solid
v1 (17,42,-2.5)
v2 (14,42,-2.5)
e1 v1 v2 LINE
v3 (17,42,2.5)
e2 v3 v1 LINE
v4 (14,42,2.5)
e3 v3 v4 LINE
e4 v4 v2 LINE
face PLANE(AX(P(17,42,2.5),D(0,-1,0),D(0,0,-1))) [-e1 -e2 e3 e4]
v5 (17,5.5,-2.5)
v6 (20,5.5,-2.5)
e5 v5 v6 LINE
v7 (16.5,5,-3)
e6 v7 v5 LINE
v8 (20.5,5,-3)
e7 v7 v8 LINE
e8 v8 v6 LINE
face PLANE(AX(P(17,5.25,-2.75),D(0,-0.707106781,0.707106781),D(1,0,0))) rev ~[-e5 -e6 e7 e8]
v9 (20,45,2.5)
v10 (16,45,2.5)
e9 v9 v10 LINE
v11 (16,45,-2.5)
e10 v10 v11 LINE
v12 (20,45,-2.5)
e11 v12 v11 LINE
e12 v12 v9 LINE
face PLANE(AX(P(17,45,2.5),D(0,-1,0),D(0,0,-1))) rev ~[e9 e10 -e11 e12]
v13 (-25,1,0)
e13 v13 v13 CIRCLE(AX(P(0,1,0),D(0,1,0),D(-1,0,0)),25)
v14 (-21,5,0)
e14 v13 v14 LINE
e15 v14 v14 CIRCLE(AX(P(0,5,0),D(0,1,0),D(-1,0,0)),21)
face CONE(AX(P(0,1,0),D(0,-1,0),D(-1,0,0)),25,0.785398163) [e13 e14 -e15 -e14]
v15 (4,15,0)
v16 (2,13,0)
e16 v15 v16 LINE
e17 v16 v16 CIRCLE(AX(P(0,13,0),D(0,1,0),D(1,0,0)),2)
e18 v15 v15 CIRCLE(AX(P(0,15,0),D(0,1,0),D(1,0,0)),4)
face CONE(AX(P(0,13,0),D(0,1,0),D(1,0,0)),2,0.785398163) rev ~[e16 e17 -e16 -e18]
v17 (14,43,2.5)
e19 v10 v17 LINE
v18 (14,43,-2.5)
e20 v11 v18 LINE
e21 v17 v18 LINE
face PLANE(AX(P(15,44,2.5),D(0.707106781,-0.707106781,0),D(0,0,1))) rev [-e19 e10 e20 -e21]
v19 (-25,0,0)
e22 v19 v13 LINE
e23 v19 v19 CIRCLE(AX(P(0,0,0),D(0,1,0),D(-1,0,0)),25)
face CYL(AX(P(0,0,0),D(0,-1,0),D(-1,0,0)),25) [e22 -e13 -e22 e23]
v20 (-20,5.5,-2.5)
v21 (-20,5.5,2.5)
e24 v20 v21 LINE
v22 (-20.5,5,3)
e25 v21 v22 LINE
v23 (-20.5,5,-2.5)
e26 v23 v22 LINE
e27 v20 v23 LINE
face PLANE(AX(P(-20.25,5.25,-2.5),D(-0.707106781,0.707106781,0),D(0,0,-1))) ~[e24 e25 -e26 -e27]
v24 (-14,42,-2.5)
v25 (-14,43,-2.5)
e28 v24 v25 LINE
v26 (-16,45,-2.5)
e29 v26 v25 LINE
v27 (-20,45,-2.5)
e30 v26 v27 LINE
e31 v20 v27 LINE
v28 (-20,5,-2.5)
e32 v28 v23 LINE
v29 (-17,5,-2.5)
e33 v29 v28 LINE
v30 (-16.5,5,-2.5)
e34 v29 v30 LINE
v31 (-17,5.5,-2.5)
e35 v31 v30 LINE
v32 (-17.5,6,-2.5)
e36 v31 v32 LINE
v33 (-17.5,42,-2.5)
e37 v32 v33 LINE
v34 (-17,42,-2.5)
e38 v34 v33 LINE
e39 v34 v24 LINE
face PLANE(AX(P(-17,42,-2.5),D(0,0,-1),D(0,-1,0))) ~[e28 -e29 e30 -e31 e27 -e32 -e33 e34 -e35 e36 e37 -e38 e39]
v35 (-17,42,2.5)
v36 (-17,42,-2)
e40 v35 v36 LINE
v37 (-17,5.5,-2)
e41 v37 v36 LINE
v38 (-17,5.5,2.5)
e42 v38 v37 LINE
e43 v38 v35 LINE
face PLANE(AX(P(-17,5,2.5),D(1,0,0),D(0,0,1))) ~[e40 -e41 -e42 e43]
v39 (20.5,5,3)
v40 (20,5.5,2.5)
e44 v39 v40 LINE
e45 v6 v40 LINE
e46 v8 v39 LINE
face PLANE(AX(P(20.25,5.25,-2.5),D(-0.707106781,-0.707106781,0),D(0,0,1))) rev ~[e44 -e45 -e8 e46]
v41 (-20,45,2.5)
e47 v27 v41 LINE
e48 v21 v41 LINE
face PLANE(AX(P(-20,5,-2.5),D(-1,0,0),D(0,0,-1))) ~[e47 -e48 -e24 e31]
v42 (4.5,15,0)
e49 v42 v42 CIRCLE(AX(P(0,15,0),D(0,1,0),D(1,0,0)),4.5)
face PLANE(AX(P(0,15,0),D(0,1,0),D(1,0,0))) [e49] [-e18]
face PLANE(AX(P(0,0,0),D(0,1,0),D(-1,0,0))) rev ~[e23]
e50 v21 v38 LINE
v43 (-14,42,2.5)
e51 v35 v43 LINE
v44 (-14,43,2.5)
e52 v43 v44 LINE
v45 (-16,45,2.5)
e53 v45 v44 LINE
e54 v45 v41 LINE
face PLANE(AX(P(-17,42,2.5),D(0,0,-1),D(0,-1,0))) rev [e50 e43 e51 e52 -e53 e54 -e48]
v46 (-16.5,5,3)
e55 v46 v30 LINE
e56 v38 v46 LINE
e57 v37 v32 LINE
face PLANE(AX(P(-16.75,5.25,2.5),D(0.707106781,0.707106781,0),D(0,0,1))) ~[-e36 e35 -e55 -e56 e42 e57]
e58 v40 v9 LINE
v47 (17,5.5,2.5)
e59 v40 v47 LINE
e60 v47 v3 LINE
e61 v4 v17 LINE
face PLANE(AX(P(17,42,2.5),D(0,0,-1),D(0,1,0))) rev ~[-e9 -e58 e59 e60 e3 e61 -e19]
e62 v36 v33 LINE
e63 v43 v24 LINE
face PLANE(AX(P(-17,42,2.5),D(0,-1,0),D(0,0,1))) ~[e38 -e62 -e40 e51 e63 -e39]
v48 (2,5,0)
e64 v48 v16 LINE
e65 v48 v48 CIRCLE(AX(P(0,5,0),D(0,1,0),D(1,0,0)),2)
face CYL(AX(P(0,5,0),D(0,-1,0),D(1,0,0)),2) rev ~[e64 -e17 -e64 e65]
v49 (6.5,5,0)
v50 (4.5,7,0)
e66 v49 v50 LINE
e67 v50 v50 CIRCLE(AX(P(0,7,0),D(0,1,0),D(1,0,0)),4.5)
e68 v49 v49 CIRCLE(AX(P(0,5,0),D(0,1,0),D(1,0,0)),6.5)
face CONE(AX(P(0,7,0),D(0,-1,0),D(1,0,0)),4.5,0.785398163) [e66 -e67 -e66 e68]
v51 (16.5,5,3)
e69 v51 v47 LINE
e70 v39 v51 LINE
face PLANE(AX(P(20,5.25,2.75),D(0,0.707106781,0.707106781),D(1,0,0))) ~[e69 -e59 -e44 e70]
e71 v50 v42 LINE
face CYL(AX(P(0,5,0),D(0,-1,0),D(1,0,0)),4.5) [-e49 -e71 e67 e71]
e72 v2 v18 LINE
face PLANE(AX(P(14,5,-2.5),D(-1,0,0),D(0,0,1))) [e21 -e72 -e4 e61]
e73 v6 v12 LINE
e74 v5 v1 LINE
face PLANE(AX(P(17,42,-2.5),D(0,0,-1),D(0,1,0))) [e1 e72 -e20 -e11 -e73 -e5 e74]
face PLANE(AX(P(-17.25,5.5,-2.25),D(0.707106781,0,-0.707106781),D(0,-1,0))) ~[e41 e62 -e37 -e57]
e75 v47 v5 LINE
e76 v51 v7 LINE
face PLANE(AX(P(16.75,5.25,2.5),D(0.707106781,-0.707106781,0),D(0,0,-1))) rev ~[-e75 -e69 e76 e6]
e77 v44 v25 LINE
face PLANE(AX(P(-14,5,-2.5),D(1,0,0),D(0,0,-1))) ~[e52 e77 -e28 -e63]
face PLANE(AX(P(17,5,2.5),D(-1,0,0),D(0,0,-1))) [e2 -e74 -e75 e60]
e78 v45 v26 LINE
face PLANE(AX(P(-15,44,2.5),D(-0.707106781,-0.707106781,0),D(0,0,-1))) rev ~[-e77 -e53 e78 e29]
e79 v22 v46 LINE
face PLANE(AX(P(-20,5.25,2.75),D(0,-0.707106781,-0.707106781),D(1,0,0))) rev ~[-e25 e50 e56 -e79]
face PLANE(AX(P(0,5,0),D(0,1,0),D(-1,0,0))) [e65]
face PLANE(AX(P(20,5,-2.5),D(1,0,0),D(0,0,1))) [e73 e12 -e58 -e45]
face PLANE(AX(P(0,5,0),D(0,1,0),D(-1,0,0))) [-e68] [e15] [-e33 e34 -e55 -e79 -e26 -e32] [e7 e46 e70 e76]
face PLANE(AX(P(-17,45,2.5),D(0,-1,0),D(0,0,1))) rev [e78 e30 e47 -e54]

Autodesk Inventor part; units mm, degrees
ref_plane "YZ Plane" through (0, 0, 0) normal (1, 0, 0) x (0, 1, 0)
ref_plane "XZ Plane" through (0, 0, 0) normal (0, 1, 0) x (-1, 0, 0)
ref_plane "XY Plane" through (0, 0, 0) normal (0, 0, 1) x (1, 0, 0)
sketch "Sketch1" plane through (0, 0, 0) normal (0, 1, 0) x (-1, 0, 0)
  circle A0 centre (0, 0) radius 25
  dimension "d0" = 50
extrude "Extrusion1" add sketch "Sketch1" along normal blind 5
chamfer "Chamfer1" distance 4 angle 45 1 edges at (25, 5, 0)
sketch "Sketch2" plane through (0, 5, 0) normal (0, 1, 0) x (1, 0, 0)
  circle A0 centre (0, 0) radius 2
  circle A1 centre (0, 0) radius 4.5
  dimension "d6" = 4
  dimension "d7" = 9
extrude "Extrusion2" add sketch "Sketch2" along normal blind 10
chamfer "Chamfer2" distance 2 angle 45 1 edges at (-4.5, 5, 0)
chamfer "Chamfer3" distance 2 angle 45 1 edges at (-2, 15, 0)
sketch "Sketch3" plane through (0, 5, 0) normal (0, 1, 0) x (1, 0, 0)
  line L0 (17, 2.5) -> (20, 2.5)
  line L1 (20, 2.5) -> (20, -2.5)
  line L2 (20, -2.5) -> (17, -2.5)
  line L3 (17, -2.5) -> (17, 2.5)
  point P0 (0, 0)
  dimension "d16" = 3
  dimension "d17" = 5
  dimension "d29" = 17
extrude "Extrusion3" add sketch "Sketch3" along normal blind 40
sketch "Sketch4" plane through (17, 5, -2.5) normal (-1, 0, 0) x (0, 0, 1)
  line L0 (5, 40) -> (0, 40) projected
  line L1 (5, 0) -> (5, 40) projected
  line L2 (0, 40) -> (5, 40)
  line L3 (5, 40) -> (5, 37)
  line L4 (5, 37) -> (0, 37)
  line L5 (0, 37) -> (0, 40)
  point P0 (2.5, -5)
  dimension "d20" = 3
extrude "Extrusion4" add sketch "Sketch4" along normal blind 3
chamfer "Chamfer4" distance 2 angle 45 1 edges at (14, 45, 0)
mirror "Mirror1" about plane through (0, 0, 0) normal (1, 0, 0) of "Extrusion3", "Chamfer4", "Extrusion4"
chamfer "Chamfer6" distance 0.5 angle 45 8 edges at (20, 5, 0) (18.5, 5, 2.5) (18.5, 5, -2.5) (17, 5, 0) (-17, 5, 0) (-18.5, 5, 2.5) (-20, 5, 0) (-17, 23.5, -2.5)
properties part number "supportPoint2"
